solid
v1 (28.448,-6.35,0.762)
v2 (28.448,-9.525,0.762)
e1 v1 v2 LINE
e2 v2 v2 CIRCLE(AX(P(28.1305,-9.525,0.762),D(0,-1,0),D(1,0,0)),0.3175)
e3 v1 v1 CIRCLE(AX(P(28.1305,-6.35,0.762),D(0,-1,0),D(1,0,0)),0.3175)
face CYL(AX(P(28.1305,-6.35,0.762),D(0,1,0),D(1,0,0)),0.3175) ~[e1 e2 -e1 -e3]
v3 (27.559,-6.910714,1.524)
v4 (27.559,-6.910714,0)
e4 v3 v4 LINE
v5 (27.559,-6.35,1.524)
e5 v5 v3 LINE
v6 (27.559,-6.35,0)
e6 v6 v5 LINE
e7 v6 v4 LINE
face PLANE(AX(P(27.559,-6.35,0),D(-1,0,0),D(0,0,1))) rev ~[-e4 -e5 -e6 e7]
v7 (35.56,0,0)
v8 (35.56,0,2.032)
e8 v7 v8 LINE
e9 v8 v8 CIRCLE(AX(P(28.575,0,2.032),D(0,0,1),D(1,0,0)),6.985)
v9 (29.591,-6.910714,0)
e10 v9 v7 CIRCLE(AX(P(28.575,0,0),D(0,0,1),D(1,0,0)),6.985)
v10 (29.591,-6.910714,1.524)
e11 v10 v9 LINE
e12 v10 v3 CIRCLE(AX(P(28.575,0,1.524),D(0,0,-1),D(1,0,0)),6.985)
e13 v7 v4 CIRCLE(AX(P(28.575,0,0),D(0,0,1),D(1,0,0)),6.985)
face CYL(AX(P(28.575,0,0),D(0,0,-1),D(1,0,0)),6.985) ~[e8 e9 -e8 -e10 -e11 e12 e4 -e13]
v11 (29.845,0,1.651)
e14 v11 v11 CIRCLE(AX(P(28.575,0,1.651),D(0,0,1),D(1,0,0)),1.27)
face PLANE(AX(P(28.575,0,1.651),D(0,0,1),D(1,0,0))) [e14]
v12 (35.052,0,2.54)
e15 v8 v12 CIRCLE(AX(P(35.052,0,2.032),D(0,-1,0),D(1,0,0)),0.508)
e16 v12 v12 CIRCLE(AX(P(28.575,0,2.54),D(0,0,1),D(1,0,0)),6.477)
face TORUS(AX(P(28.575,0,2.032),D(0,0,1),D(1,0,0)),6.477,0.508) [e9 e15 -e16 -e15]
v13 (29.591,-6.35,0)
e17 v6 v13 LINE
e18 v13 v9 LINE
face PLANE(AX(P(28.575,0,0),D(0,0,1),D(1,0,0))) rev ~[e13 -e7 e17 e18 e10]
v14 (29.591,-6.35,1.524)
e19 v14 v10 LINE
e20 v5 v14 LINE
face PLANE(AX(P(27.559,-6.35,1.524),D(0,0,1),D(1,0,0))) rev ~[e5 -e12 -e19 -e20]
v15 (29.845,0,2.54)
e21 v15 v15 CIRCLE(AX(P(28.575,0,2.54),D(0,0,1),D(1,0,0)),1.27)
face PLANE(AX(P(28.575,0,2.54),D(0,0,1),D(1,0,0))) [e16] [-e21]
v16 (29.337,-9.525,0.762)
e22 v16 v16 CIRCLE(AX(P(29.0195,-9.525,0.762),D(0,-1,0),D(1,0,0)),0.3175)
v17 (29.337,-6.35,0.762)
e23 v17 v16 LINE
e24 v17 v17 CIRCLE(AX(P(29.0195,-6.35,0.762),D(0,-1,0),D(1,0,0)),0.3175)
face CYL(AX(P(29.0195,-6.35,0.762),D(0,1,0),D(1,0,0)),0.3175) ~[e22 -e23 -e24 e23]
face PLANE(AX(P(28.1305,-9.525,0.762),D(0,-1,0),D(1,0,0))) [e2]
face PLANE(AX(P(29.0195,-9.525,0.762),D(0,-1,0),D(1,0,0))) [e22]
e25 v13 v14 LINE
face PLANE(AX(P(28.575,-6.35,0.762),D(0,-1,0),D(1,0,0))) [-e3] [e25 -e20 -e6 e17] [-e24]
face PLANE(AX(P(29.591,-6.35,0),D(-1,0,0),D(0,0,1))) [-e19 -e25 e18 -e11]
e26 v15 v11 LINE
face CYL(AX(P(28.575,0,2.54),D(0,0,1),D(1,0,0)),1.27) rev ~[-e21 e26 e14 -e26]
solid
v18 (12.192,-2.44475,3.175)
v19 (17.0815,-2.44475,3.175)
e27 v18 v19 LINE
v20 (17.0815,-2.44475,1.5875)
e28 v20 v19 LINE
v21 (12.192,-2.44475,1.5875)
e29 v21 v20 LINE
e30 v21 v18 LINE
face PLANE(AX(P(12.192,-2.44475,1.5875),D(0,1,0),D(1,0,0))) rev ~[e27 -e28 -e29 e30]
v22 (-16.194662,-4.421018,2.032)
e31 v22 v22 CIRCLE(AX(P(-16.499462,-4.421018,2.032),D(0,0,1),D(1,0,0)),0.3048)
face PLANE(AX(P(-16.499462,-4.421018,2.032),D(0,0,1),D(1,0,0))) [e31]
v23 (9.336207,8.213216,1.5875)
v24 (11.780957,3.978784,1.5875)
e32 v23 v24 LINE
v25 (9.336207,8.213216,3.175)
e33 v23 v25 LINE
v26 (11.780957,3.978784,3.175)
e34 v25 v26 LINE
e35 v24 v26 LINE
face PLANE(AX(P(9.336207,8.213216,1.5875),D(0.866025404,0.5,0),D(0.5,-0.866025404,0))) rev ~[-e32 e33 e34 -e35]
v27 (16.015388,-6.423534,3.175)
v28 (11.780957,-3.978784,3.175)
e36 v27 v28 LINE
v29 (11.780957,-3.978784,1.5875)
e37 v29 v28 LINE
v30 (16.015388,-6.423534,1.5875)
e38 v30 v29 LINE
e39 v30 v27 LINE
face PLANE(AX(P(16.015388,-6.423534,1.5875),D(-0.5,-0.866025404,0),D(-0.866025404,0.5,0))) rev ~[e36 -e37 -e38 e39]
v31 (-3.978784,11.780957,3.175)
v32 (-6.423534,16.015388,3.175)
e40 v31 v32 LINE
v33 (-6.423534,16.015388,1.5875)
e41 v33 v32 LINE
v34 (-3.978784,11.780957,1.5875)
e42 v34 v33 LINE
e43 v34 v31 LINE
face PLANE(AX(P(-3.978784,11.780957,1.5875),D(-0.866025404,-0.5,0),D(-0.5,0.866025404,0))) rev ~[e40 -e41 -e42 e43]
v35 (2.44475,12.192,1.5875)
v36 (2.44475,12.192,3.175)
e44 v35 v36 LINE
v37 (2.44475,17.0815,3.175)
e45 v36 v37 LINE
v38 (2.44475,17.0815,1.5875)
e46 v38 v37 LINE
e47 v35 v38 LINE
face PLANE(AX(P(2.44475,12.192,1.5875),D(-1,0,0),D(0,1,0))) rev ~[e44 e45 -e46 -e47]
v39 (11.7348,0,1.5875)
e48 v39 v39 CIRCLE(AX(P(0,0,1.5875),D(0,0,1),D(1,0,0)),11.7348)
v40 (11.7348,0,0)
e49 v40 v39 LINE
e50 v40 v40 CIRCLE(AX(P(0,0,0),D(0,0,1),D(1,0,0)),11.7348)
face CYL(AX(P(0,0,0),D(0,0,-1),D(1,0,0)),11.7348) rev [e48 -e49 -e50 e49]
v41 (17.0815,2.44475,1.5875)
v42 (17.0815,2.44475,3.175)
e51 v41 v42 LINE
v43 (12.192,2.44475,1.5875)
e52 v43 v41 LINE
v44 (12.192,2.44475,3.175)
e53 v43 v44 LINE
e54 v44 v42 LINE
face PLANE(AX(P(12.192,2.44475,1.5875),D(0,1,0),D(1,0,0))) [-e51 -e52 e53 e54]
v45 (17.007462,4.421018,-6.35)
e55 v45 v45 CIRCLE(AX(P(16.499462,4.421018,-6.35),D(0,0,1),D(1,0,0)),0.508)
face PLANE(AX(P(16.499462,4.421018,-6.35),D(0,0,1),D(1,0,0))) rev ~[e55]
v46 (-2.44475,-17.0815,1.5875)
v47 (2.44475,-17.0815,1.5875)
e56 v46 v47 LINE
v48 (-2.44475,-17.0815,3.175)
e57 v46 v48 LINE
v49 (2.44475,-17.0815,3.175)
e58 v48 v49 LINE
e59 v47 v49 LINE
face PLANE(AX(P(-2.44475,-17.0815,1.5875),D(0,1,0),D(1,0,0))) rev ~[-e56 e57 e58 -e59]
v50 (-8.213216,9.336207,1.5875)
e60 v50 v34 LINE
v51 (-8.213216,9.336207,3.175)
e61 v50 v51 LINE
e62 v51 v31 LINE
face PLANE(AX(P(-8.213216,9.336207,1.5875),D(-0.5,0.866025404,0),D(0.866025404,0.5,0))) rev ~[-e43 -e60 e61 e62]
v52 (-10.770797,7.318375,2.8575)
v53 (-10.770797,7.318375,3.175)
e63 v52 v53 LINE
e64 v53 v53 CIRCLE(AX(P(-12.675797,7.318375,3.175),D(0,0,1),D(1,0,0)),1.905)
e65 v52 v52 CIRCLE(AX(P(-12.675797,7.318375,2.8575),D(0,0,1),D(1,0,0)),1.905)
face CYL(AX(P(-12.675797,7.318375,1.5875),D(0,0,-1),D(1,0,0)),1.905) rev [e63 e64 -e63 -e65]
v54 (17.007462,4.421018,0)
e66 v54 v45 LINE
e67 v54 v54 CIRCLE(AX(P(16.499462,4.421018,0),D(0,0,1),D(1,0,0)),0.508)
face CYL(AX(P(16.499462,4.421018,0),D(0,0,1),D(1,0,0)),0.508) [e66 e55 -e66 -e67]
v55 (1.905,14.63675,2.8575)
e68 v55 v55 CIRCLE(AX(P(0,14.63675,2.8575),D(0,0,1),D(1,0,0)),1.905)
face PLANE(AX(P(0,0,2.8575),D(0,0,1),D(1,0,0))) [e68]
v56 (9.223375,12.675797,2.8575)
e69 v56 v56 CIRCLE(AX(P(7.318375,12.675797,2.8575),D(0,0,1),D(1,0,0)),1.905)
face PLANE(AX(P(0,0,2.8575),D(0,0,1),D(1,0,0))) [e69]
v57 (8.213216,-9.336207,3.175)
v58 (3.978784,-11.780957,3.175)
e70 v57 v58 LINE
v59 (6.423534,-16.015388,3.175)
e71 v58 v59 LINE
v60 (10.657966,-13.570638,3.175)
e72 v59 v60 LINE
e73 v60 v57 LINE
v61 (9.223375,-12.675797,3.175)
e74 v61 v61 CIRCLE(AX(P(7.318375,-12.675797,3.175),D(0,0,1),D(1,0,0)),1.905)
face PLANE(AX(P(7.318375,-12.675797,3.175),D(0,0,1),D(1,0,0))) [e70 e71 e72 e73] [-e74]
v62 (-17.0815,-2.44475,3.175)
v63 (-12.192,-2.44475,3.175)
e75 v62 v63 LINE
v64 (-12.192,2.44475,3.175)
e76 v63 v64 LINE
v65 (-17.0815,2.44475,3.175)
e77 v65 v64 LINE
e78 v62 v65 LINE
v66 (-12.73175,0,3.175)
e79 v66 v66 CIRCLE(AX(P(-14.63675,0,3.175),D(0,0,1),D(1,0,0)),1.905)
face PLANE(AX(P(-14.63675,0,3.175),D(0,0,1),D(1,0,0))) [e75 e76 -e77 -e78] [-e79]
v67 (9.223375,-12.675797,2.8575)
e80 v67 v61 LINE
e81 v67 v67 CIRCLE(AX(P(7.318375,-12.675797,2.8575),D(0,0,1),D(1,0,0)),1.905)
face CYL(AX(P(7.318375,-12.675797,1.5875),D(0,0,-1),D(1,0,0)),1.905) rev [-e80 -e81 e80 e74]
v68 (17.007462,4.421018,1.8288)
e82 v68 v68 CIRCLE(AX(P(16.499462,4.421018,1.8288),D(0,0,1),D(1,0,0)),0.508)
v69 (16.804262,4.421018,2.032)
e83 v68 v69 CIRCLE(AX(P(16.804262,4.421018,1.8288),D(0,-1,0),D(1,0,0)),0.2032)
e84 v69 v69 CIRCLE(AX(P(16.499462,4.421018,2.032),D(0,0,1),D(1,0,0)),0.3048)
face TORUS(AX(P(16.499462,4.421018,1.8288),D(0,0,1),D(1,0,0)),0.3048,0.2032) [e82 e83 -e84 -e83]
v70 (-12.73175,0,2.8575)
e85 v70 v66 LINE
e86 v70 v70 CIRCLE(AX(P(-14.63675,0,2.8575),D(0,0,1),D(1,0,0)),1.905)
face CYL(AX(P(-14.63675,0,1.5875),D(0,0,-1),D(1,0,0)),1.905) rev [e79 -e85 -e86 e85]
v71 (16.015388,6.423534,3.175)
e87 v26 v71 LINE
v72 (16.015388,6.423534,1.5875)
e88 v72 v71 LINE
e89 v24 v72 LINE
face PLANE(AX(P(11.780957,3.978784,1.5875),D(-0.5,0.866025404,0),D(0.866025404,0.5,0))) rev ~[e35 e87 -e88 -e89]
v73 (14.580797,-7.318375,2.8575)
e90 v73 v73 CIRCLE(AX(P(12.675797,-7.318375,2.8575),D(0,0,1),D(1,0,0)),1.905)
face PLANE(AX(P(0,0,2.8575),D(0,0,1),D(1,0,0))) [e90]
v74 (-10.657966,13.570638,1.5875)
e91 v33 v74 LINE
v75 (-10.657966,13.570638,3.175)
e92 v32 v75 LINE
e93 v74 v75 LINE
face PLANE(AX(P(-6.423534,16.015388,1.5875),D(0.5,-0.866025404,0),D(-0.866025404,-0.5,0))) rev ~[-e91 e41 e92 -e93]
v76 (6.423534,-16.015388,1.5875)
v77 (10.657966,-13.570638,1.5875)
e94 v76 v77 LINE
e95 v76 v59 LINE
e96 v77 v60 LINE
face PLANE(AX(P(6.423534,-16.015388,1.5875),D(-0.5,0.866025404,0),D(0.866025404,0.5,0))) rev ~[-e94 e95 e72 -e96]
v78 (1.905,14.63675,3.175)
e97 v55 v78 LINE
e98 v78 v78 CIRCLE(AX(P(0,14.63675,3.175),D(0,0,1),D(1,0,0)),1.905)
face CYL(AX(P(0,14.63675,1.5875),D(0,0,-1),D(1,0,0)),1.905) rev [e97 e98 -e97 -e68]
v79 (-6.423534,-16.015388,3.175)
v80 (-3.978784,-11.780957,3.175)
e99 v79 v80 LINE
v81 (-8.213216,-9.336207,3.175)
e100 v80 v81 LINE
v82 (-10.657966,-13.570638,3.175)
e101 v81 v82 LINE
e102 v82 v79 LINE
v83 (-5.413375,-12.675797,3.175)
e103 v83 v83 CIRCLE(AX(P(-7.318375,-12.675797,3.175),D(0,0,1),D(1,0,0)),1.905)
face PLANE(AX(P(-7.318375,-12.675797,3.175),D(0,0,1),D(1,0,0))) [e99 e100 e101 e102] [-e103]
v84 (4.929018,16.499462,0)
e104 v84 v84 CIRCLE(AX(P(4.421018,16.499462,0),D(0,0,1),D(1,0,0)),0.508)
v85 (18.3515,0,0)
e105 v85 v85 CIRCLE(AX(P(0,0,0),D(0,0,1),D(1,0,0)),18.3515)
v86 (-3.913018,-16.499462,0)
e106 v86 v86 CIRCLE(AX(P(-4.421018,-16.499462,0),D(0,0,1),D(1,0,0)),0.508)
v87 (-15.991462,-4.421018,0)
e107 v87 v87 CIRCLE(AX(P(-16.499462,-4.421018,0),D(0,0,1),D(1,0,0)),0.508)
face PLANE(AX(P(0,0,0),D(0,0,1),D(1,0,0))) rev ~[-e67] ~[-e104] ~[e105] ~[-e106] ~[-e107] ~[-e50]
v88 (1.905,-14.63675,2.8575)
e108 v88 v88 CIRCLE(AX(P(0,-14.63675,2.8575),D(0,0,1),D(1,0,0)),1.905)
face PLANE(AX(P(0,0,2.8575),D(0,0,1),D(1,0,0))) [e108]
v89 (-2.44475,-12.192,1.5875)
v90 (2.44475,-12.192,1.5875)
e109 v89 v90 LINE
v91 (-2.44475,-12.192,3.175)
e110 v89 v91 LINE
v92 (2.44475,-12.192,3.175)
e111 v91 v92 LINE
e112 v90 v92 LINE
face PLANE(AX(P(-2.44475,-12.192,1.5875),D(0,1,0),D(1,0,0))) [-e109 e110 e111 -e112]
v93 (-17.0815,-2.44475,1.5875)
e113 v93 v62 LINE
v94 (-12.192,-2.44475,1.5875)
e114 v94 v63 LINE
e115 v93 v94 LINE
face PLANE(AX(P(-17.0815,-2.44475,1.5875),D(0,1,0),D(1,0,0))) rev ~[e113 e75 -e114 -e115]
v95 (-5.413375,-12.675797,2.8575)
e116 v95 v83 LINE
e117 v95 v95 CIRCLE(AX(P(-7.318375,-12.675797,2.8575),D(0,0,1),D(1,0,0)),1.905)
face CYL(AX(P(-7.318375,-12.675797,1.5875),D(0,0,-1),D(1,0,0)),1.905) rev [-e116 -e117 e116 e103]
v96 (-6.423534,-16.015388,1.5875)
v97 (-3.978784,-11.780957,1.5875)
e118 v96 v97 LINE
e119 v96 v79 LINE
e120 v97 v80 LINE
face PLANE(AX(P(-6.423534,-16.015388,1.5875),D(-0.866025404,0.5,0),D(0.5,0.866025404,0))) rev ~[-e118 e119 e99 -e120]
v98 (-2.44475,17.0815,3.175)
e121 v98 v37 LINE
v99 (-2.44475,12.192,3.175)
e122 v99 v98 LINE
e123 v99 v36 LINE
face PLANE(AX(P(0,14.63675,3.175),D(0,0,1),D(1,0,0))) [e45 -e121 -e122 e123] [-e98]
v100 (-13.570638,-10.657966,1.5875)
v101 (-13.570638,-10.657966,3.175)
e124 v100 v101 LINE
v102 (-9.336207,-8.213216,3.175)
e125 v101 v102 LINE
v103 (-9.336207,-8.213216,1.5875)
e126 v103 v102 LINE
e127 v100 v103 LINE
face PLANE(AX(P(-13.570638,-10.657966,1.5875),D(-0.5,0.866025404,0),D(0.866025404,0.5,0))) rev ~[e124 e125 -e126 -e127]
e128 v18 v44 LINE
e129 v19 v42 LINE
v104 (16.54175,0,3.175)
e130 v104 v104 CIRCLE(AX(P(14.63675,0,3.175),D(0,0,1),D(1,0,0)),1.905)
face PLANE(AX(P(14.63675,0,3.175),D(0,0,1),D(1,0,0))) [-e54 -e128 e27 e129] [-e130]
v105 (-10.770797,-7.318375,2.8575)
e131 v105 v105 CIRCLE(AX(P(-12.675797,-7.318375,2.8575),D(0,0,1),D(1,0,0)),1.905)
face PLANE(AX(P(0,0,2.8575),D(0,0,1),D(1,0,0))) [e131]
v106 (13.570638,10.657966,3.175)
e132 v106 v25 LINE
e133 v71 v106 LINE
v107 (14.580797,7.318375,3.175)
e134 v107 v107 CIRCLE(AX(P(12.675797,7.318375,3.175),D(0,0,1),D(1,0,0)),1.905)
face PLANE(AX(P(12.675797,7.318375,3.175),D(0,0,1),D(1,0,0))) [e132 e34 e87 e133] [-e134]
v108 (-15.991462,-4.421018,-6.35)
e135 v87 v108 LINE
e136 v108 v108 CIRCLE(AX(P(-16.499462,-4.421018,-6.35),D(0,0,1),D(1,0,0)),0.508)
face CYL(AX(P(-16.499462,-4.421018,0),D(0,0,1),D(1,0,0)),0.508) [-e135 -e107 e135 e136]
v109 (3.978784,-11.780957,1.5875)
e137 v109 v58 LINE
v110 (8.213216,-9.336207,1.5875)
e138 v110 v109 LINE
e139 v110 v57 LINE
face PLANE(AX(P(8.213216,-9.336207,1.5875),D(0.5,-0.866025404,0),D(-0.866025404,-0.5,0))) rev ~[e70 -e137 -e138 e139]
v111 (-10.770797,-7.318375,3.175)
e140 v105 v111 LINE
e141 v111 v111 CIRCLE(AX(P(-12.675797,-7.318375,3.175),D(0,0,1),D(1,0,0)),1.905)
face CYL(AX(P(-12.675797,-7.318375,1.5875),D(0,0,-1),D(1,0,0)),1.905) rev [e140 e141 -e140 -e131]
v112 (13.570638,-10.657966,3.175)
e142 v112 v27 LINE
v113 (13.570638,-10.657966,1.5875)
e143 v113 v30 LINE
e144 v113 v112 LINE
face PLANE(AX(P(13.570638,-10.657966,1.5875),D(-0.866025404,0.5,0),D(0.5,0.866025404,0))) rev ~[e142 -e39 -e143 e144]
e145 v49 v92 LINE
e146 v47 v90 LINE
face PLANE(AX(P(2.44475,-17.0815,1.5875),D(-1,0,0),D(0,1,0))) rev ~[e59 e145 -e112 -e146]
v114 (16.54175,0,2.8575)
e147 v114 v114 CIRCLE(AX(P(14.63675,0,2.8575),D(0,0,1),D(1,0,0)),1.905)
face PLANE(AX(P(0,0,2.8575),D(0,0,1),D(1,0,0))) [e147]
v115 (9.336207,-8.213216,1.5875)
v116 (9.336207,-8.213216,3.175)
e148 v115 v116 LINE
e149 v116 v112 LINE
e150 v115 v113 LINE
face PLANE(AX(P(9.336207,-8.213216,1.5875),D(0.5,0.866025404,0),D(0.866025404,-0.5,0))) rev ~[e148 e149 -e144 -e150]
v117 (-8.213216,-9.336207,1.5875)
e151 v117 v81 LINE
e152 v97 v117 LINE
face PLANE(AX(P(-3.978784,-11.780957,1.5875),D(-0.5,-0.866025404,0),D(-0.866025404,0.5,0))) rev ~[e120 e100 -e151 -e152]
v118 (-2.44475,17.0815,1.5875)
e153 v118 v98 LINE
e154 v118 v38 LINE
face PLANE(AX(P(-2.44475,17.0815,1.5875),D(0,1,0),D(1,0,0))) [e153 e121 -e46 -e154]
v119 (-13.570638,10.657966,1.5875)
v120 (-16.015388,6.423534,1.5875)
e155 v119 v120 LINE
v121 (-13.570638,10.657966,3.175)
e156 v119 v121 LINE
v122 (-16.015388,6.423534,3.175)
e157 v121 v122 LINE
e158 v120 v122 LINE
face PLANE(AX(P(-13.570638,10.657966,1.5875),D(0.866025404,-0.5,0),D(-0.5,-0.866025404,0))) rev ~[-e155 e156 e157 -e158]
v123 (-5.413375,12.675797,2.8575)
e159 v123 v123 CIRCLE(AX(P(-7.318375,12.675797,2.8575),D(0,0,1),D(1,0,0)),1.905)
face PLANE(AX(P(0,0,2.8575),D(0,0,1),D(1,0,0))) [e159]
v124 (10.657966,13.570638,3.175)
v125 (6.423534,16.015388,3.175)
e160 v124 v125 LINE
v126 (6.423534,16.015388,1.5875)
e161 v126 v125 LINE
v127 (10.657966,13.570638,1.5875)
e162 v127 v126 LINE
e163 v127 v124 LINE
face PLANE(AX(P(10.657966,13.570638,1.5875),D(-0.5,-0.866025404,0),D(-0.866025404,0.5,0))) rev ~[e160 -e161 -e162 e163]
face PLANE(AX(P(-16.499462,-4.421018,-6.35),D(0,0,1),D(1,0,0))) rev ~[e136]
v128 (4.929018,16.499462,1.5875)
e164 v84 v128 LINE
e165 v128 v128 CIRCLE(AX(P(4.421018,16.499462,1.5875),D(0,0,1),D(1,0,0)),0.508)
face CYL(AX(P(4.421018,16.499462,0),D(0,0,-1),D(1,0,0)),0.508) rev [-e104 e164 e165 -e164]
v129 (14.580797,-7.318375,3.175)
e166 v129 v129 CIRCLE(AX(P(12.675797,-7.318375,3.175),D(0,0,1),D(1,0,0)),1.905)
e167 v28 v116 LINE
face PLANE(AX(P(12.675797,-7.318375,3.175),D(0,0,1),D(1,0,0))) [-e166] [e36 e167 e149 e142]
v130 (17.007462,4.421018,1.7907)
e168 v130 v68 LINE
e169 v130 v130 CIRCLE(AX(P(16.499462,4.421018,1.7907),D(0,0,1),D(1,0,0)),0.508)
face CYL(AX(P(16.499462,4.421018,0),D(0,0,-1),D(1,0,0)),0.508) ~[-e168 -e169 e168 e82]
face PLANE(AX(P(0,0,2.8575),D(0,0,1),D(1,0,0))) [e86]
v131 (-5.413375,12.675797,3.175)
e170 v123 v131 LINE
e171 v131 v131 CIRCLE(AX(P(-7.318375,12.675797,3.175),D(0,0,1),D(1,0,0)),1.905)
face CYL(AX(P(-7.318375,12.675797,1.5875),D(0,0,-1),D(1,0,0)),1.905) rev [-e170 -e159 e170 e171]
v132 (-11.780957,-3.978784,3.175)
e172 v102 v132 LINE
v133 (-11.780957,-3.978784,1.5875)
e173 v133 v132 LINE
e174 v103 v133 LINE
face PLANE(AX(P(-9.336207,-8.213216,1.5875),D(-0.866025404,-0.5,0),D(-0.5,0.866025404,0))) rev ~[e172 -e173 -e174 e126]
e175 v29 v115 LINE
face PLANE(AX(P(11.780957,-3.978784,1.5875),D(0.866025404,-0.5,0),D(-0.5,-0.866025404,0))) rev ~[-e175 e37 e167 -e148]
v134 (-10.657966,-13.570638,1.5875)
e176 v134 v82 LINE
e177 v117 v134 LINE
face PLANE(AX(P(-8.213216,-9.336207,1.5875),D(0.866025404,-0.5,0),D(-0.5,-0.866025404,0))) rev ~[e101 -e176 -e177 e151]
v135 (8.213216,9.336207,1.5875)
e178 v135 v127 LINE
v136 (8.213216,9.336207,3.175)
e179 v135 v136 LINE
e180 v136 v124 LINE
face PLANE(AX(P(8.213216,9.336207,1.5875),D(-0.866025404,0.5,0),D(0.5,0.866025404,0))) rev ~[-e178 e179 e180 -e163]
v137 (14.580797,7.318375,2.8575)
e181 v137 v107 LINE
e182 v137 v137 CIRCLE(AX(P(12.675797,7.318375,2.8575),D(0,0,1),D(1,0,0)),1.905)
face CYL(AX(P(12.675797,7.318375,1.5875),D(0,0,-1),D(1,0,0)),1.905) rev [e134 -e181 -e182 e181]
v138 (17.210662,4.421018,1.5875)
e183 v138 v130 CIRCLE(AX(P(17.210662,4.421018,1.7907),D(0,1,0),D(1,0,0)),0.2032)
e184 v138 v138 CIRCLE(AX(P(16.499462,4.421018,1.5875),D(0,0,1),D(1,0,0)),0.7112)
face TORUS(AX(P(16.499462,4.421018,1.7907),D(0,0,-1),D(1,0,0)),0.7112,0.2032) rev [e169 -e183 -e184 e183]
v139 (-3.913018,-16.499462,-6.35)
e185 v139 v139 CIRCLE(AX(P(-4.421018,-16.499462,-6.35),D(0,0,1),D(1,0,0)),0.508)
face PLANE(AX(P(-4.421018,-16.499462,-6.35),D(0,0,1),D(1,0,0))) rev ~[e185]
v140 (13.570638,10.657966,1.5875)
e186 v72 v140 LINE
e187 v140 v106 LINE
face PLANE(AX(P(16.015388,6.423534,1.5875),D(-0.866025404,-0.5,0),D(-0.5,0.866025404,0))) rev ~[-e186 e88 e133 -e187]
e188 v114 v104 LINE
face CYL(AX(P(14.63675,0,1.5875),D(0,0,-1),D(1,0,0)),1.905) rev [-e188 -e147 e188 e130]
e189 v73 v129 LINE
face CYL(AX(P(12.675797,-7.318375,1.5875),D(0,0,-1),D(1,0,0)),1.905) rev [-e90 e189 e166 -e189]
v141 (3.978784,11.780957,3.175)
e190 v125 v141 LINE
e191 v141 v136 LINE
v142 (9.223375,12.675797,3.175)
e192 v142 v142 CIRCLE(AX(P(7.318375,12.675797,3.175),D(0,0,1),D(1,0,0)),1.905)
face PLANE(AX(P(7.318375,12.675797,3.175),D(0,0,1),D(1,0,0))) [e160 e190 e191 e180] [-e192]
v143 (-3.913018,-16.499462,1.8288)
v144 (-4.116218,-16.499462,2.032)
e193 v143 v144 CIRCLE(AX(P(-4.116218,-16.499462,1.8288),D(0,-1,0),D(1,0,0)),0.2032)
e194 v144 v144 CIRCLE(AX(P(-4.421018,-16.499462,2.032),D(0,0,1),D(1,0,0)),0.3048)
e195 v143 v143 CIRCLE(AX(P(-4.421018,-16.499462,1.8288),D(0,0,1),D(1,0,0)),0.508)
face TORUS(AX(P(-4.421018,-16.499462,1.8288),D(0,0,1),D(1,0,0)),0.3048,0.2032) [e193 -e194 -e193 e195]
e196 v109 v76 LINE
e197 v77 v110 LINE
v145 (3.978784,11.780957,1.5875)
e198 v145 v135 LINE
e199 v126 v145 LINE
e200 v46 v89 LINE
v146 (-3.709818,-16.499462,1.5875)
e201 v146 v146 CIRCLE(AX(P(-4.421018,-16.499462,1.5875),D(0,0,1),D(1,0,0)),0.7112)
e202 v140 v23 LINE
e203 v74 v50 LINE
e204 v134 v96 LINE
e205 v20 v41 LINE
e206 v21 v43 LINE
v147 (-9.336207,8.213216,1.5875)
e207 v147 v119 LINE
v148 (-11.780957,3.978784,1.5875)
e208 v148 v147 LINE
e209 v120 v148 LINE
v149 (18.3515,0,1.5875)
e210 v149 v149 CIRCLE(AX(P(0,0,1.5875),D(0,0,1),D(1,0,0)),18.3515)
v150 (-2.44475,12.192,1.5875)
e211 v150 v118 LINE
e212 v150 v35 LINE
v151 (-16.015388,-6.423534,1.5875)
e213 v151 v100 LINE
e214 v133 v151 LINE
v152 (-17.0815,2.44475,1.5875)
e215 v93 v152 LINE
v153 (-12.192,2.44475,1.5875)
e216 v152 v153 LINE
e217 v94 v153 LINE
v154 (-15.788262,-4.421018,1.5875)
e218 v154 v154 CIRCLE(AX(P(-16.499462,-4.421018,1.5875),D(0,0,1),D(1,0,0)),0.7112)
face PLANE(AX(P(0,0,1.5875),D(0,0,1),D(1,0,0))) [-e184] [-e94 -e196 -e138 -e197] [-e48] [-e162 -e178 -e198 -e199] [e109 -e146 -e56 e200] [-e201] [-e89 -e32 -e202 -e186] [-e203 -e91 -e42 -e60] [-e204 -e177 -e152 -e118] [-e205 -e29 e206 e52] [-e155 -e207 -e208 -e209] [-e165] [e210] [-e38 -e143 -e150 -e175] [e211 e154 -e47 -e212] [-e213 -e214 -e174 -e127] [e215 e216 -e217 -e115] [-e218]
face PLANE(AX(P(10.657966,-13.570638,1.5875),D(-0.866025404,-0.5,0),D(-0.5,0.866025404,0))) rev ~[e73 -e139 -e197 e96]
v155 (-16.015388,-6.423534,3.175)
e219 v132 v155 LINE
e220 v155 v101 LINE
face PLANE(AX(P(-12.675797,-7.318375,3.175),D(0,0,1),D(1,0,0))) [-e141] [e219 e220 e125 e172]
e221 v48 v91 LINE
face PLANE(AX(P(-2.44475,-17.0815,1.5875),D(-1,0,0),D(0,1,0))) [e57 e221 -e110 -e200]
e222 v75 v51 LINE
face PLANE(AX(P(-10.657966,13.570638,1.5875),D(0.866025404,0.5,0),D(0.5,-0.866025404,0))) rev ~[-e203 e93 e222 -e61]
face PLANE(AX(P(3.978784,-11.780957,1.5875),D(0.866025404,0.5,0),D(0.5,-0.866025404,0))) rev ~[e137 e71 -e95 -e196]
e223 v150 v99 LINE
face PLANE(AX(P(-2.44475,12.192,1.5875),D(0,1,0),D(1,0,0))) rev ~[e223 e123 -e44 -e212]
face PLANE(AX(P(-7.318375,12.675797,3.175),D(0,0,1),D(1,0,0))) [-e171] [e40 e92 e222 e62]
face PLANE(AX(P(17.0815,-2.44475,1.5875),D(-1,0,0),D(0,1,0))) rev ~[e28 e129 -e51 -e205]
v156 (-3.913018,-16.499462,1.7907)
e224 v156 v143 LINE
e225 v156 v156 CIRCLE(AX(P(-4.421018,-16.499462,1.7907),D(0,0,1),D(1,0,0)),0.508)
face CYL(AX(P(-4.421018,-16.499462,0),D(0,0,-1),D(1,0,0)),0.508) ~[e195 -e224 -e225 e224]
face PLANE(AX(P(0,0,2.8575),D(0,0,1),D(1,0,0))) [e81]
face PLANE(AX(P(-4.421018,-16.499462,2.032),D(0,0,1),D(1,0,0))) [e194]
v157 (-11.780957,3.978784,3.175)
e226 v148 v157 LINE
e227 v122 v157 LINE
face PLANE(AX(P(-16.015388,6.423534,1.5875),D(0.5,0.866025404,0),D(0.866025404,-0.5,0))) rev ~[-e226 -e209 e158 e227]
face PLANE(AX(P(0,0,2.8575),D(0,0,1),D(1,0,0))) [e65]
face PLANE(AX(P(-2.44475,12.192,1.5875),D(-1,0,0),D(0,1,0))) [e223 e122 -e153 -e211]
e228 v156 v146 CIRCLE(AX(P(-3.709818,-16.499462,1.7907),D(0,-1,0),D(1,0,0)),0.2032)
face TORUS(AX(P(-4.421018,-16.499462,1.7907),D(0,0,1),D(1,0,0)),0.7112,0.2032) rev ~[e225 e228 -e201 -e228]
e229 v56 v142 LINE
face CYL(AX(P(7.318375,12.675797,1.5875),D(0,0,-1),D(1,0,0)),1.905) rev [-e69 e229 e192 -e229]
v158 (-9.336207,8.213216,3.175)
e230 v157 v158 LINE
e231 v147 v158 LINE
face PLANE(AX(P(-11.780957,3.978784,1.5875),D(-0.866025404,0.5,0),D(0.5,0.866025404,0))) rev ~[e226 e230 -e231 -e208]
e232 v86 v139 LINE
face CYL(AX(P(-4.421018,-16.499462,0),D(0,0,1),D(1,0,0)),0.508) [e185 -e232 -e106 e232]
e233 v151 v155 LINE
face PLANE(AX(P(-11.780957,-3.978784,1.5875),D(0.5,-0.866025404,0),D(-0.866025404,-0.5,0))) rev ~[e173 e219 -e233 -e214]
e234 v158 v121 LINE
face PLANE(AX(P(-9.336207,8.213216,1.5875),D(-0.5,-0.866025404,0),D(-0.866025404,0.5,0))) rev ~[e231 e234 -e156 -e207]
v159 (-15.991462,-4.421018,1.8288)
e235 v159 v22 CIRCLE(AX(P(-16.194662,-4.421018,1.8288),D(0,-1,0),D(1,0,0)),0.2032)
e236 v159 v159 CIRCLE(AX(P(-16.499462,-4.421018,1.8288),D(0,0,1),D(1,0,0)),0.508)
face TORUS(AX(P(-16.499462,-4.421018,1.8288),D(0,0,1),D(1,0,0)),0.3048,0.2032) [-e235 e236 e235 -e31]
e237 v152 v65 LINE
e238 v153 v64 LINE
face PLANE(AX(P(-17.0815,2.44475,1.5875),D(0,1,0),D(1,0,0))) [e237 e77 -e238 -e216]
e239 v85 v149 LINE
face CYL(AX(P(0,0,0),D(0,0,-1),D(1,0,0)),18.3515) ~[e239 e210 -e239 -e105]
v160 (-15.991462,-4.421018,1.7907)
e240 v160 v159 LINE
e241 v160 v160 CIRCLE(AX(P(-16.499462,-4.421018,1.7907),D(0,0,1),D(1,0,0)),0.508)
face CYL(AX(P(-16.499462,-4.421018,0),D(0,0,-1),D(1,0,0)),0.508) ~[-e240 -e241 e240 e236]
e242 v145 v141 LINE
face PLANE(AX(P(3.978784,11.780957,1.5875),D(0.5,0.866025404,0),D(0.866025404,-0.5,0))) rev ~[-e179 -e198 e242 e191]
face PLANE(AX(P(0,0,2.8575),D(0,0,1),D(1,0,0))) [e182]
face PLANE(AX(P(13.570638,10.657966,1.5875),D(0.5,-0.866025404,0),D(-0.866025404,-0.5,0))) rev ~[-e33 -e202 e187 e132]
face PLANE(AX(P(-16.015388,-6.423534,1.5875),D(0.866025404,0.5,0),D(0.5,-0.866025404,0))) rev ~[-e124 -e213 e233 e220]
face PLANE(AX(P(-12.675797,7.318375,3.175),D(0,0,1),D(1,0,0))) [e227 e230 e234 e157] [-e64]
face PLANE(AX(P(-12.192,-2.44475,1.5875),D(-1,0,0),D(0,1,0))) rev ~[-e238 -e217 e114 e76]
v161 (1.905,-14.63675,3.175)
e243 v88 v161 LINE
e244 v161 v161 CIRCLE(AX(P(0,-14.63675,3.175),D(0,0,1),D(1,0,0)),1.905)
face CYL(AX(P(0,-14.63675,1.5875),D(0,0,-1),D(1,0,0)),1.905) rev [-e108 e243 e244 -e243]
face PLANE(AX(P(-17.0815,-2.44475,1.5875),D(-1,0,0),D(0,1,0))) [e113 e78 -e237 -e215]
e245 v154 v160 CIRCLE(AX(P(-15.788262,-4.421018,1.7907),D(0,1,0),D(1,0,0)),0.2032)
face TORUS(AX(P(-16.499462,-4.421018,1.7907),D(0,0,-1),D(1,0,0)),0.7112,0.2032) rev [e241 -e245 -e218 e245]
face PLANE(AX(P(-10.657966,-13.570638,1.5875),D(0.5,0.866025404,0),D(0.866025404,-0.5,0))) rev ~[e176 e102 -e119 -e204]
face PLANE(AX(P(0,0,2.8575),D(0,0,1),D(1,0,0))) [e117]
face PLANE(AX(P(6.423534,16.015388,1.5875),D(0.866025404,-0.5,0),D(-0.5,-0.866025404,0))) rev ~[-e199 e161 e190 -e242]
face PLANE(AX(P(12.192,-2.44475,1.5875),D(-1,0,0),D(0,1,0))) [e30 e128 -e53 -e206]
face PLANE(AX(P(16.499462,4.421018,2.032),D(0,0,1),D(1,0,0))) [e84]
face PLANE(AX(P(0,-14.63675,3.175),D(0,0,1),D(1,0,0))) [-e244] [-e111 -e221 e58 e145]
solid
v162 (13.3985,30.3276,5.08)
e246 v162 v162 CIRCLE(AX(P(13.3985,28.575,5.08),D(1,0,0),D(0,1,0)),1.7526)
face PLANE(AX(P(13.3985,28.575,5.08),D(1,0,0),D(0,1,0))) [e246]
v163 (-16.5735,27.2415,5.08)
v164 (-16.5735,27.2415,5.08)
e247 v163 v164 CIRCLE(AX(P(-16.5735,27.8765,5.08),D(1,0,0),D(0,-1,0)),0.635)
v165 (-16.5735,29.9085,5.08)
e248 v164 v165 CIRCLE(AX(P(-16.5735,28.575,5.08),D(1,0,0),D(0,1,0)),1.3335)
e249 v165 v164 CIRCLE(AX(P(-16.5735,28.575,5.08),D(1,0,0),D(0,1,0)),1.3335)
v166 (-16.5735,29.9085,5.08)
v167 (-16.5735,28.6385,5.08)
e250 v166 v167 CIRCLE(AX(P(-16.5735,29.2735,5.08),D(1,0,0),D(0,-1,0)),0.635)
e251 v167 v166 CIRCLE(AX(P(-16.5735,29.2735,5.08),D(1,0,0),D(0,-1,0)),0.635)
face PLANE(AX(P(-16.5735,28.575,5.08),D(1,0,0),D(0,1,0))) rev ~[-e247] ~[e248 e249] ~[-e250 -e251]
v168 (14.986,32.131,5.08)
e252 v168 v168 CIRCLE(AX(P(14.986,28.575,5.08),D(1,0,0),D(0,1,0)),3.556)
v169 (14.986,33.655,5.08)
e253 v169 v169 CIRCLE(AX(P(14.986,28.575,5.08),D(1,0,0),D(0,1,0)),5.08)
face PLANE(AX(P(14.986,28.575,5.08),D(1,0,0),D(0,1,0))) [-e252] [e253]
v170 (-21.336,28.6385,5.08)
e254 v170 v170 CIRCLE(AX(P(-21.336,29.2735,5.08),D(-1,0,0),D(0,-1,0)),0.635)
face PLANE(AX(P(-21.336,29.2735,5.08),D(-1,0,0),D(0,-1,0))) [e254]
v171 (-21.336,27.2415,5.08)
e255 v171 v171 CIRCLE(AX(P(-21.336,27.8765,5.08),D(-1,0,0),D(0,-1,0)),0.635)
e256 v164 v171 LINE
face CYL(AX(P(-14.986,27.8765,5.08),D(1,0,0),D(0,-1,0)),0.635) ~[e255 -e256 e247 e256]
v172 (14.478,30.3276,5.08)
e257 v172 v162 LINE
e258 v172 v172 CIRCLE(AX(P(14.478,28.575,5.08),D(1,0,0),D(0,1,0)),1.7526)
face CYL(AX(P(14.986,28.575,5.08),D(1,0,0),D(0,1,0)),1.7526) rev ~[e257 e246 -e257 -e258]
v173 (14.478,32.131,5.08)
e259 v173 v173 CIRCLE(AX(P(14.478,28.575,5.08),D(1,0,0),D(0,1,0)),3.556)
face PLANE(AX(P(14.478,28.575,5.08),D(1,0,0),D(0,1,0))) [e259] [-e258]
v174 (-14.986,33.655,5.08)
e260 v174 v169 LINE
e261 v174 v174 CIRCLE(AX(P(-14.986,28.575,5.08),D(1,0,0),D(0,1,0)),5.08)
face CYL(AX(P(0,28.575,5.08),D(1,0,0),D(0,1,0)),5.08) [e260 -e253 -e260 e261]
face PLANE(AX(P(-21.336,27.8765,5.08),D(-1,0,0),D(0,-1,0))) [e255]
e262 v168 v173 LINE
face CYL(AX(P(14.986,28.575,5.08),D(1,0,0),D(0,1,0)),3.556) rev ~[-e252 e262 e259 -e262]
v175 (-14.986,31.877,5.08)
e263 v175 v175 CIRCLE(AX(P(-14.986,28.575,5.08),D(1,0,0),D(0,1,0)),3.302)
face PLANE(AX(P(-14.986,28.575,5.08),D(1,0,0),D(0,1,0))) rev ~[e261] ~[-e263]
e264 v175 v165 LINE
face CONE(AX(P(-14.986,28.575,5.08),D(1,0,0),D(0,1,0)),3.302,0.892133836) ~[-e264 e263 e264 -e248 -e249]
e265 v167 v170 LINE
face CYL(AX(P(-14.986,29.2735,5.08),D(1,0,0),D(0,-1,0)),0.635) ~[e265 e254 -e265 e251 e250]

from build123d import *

# Parameters (mm, degrees)
F0_R          = 18.3515
F0_R_2        = 0.508
F0_R_3        = 11.7348
F1_DEPTH      = 1.5875
F2_W          = 4.8895
F2_H          = 4.8895
F2_R          = 1.905
F3_DEPTH      = 1.5875
F4_DEPTH      = 1.27
F5_DEPTH      = 6.35
F5_DEPTH_BACK = 2.032
F6_R          = 0.2032
F7_R          = 6.985
F8_DEPTH      = 2.54
F9_R          = 0.508
F10_R         = 1.27
F11_DEPTH     = 0.889
F13_START     = 6.35
F12_W         = 2.032
F12_H         = 1.524
F13_DEPTH     = 1.27
F14_R         = 0.3175
F15_DEPTH     = 3.175
F16_R         = 5.08
F17_DEPTH     = 14.986
F18_R         = 1.7526
F19_DEPTH     = 1.5875
F18_R_2       = 3.556
F20_DEPTH     = 0.508
F21_R         = 0.635
F22_DEPTH     = 6.35


with BuildPart() as f1:
    # F0 (on Top) → F1 (new body)
    with BuildSketch(Plane.XY):
        Circle(F0_R)
        with Locations((-4.4210175189, -16.4994620018)):
            Circle(F0_R_2, mode=Mode.SUBTRACT)
        with Locations((-16.4994620018, -4.4210175189)):
            Circle(F0_R_2, mode=Mode.SUBTRACT)
        Circle(F0_R_3, mode=Mode.SUBTRACT)
        with Locations((16.4994620018, 4.4210175189)):
            Circle(F0_R_2, mode=Mode.SUBTRACT)
        with Locations((4.4210175189, 16.4994620018)):
            Circle(F0_R_2, mode=Mode.SUBTRACT)
    extrude(amount=F1_DEPTH)

    # F2 (on face) → F3 (join)
    with BuildSketch(Plane.XY.offset(1.5875)):
        with Locations((0, 14.63675)):
            Rectangle(F2_W, F2_H)
        with Locations((0, 14.63675)):
            Circle(F2_R, mode=Mode.SUBTRACT)
        Polygon((-6.4235343941, 16.0153879347), (-10.6579656059, 13.5706379347), (-8.2132156059, 9.3362067229), (-3.9787843941, 11.7809567229), align=None)
        with Locations((-7.318375, 12.6757973288)):
            Circle(F2_R, mode=Mode.SUBTRACT)
        Polygon((-13.5706379347, 10.6579656059), (-16.0153879347, 6.4235343941), (-11.7809567229, 3.9787843941), (-9.3362067229, 8.2132156059), align=None)
        with Locations((-12.6757973288, 7.318375)):
            Circle(F2_R, mode=Mode.SUBTRACT)
        with Locations((-14.63675, 0)):
            Rectangle(F2_W, F2_H)
        with Locations((-14.63675, 0)):
            Circle(F2_R, mode=Mode.SUBTRACT)
        Polygon((-16.0153879347, -6.4235343941), (-13.5706379347, -10.6579656059), (-9.3362067229, -8.2132156059), (-11.7809567229, -3.9787843941), align=None)
        with Locations((-12.6757973288, -7.318375)):
            Circle(F2_R, mode=Mode.SUBTRACT)
        Polygon((-10.6579656059, -13.5706379347), (-6.4235343941, -16.0153879347), (-3.9787843941, -11.7809567229), (-8.2132156059, -9.3362067229), align=None)
        with Locations((-7.318375, -12.6757973288)):
            Circle(F2_R, mode=Mode.SUBTRACT)
        with Locations((0, -14.63675)):
            Rectangle(F2_W, F2_H)
        with Locations((0, -14.63675)):
            Circle(F2_R, mode=Mode.SUBTRACT)
        Polygon((6.4235343941, -16.0153879347), (10.6579656059, -13.5706379347), (8.2132156059, -9.3362067229), (3.9787843941, -11.7809567229), align=None)
        with Locations((7.318375, -12.6757973288)):
            Circle(F2_R, mode=Mode.SUBTRACT)
        Polygon((13.5706379347, -10.6579656059), (16.0153879347, -6.4235343941), (11.7809567229, -3.9787843941), (9.3362067229, -8.2132156059), align=None)
        with Locations((12.6757973288, -7.318375)):
            Circle(F2_R, mode=Mode.SUBTRACT)
        with Locations((14.63675, 0)):
            Rectangle(F2_W, F2_H)
        with Locations((14.63675, 0)):
            Circle(F2_R, mode=Mode.SUBTRACT)
        Polygon((16.0153879347, 6.4235343941), (13.5706379347, 10.6579656059), (9.3362067229, 8.2132156059), (11.7809567229, 3.9787843941), align=None)
        with Locations((12.6757973288, 7.318375)):
            Circle(F2_R, mode=Mode.SUBTRACT)
        Polygon((10.6579656059, 13.5706379347), (6.4235343941, 16.0153879347), (3.9787843941, 11.7809567229), (8.2132156059, 9.3362067229), align=None)
        with Locations((7.318375, 12.6757973288)):
            Circle(F2_R, mode=Mode.SUBTRACT)
    extrude(amount=F3_DEPTH)

    # F4 (add): faces of the model
    f4_faces = [f1.faces().sort_by_distance(p)[0] for p in [
        (0, 14.63675, 1.5875),
        (7.318375, 12.6757973288, 1.5875),
        (12.6757973288, 7.318375, 1.5875),
        (14.63675, 0, 1.5875),
        (12.6757973288, -7.318375, 1.5875),
        (7.318375, -12.6757973288, 1.5875),
        (0, -14.63675, 1.5875),
        (-7.318375, -12.6757973288, 1.5875),
        (-12.6757973288, -7.318375, 1.5875),
        (-14.63675, 0, 1.5875),
        (-12.6757973288, 7.318375, 1.5875),
        (-7.318375, 12.6757973288, 1.5875),
    ]]
    extrude(f4_faces, amount=F4_DEPTH)

    # F0 (on Top) → F5 (join, two sides)
    with BuildSketch(Plane.XY) as f5_sk:
        with Locations((-4.4210175189, -16.4994620018)):
            Circle(F0_R_2)
        with Locations((-16.4994620018, -4.4210175189)):
            Circle(F0_R_2)
        with Locations((16.4994620018, 4.4210175189)):
            Circle(F0_R_2)
    extrude(amount=-F5_DEPTH)
    extrude(f5_sk.sketch, amount=F5_DEPTH_BACK)

    # F6
    f6_edges = [f1.edges().sort_by_distance(p)[0] for p in [
        (15.991462, 4.421018, 1.5875),
        (15.991462, 4.421018, 2.032),
        (-17.007462, -4.421018, 2.032),
        (-4.929018, -16.499462, 2.032),
        (-17.007462, -4.421018, 1.5875),
        (-4.929018, -16.499462, 1.5875),
    ]]
    fillet(f6_edges, radius=F6_R)


with BuildPart() as f8:
    # F7 (on Top) → F8 (new body)
    with BuildSketch(Plane.XY):
        with Locations((28.575, 0)):
            Circle(F7_R)
    extrude(amount=F8_DEPTH)

    # F9
    f9_edges = [f8.edges().sort_by_distance(p)[0] for p in [
        (21.59, 0, 2.54),
    ]]
    fillet(f9_edges, radius=F9_R)

    # F10 (on face) → F11 (cut)
    with BuildSketch(Plane.XY.offset(2.54)):
        with Locations((28.575, 0)):
            Circle(F10_R)
    extrude(amount=-F11_DEPTH, mode=Mode.SUBTRACT)

    # F12 (on Front) → F13 (cut)
    with BuildSketch(Plane.XZ.offset(F13_START)):
        with Locations((28.575, 0.762)):
            Rectangle(F12_W, F12_H)
    extrude(amount=F13_DEPTH, mode=Mode.SUBTRACT)

    # F14 (on face) → F15 (join)
    with BuildSketch(Plane.XZ.offset(6.35)):
        with Locations((28.1305, 0.762)):
            Circle(F14_R)
        with Locations((29.0195, 0.762)):
            Circle(F14_R)
    extrude(amount=F15_DEPTH)


with BuildPart() as f17:
    # F16 (on Right) → F17 (new body, symmetric)
    with BuildSketch(Plane.YZ):
        with Locations((28.575, 5.08)):
            Circle(F16_R)
    extrude(amount=F17_DEPTH, both=True)

    # F18 (on face) → F19 (cut)
    with BuildSketch(Plane.YZ.offset(14.986)):
        with Locations((28.575, 5.08)):
            Circle(F18_R)
    extrude(amount=-F19_DEPTH, mode=Mode.SUBTRACT)

    # F18 (on face) → F20 (cut)
    with BuildSketch(Plane.YZ.offset(14.986)):
        with Locations((28.575, 5.08)):
            Circle(F18_R_2)
        with Locations((28.575, 5.08)):
            Circle(F18_R, mode=Mode.SUBTRACT)
    extrude(amount=-F20_DEPTH, mode=Mode.SUBTRACT)

    # F21 (on face) → F22 (join)
    with BuildSketch(Plane(origin=(-14.986, 0, 0), x_dir=(0, -1, 0), z_dir=(-1, 0, 0))):
        with Locations((-29.2735, 5.08)):
            Circle(F21_R)
        with Locations((-27.8765, 5.08)):
            Circle(F21_R)
    extrude(amount=F22_DEPTH)

    # F24 (on offset) → F25 (revolve)
    with BuildSketch(Plane.XY.offset(5.08)):
        Polygon((-16.5735, 29.9085), (-16.5735, 28.575), (-14.986, 28.575), (-14.986, 31.877), align=None)
    revolve(axis=Axis((-15.77975, 28.575, 5.08), (1, 0, 0)))


solid = Compound([f1.part, f8.part, f17.part])
